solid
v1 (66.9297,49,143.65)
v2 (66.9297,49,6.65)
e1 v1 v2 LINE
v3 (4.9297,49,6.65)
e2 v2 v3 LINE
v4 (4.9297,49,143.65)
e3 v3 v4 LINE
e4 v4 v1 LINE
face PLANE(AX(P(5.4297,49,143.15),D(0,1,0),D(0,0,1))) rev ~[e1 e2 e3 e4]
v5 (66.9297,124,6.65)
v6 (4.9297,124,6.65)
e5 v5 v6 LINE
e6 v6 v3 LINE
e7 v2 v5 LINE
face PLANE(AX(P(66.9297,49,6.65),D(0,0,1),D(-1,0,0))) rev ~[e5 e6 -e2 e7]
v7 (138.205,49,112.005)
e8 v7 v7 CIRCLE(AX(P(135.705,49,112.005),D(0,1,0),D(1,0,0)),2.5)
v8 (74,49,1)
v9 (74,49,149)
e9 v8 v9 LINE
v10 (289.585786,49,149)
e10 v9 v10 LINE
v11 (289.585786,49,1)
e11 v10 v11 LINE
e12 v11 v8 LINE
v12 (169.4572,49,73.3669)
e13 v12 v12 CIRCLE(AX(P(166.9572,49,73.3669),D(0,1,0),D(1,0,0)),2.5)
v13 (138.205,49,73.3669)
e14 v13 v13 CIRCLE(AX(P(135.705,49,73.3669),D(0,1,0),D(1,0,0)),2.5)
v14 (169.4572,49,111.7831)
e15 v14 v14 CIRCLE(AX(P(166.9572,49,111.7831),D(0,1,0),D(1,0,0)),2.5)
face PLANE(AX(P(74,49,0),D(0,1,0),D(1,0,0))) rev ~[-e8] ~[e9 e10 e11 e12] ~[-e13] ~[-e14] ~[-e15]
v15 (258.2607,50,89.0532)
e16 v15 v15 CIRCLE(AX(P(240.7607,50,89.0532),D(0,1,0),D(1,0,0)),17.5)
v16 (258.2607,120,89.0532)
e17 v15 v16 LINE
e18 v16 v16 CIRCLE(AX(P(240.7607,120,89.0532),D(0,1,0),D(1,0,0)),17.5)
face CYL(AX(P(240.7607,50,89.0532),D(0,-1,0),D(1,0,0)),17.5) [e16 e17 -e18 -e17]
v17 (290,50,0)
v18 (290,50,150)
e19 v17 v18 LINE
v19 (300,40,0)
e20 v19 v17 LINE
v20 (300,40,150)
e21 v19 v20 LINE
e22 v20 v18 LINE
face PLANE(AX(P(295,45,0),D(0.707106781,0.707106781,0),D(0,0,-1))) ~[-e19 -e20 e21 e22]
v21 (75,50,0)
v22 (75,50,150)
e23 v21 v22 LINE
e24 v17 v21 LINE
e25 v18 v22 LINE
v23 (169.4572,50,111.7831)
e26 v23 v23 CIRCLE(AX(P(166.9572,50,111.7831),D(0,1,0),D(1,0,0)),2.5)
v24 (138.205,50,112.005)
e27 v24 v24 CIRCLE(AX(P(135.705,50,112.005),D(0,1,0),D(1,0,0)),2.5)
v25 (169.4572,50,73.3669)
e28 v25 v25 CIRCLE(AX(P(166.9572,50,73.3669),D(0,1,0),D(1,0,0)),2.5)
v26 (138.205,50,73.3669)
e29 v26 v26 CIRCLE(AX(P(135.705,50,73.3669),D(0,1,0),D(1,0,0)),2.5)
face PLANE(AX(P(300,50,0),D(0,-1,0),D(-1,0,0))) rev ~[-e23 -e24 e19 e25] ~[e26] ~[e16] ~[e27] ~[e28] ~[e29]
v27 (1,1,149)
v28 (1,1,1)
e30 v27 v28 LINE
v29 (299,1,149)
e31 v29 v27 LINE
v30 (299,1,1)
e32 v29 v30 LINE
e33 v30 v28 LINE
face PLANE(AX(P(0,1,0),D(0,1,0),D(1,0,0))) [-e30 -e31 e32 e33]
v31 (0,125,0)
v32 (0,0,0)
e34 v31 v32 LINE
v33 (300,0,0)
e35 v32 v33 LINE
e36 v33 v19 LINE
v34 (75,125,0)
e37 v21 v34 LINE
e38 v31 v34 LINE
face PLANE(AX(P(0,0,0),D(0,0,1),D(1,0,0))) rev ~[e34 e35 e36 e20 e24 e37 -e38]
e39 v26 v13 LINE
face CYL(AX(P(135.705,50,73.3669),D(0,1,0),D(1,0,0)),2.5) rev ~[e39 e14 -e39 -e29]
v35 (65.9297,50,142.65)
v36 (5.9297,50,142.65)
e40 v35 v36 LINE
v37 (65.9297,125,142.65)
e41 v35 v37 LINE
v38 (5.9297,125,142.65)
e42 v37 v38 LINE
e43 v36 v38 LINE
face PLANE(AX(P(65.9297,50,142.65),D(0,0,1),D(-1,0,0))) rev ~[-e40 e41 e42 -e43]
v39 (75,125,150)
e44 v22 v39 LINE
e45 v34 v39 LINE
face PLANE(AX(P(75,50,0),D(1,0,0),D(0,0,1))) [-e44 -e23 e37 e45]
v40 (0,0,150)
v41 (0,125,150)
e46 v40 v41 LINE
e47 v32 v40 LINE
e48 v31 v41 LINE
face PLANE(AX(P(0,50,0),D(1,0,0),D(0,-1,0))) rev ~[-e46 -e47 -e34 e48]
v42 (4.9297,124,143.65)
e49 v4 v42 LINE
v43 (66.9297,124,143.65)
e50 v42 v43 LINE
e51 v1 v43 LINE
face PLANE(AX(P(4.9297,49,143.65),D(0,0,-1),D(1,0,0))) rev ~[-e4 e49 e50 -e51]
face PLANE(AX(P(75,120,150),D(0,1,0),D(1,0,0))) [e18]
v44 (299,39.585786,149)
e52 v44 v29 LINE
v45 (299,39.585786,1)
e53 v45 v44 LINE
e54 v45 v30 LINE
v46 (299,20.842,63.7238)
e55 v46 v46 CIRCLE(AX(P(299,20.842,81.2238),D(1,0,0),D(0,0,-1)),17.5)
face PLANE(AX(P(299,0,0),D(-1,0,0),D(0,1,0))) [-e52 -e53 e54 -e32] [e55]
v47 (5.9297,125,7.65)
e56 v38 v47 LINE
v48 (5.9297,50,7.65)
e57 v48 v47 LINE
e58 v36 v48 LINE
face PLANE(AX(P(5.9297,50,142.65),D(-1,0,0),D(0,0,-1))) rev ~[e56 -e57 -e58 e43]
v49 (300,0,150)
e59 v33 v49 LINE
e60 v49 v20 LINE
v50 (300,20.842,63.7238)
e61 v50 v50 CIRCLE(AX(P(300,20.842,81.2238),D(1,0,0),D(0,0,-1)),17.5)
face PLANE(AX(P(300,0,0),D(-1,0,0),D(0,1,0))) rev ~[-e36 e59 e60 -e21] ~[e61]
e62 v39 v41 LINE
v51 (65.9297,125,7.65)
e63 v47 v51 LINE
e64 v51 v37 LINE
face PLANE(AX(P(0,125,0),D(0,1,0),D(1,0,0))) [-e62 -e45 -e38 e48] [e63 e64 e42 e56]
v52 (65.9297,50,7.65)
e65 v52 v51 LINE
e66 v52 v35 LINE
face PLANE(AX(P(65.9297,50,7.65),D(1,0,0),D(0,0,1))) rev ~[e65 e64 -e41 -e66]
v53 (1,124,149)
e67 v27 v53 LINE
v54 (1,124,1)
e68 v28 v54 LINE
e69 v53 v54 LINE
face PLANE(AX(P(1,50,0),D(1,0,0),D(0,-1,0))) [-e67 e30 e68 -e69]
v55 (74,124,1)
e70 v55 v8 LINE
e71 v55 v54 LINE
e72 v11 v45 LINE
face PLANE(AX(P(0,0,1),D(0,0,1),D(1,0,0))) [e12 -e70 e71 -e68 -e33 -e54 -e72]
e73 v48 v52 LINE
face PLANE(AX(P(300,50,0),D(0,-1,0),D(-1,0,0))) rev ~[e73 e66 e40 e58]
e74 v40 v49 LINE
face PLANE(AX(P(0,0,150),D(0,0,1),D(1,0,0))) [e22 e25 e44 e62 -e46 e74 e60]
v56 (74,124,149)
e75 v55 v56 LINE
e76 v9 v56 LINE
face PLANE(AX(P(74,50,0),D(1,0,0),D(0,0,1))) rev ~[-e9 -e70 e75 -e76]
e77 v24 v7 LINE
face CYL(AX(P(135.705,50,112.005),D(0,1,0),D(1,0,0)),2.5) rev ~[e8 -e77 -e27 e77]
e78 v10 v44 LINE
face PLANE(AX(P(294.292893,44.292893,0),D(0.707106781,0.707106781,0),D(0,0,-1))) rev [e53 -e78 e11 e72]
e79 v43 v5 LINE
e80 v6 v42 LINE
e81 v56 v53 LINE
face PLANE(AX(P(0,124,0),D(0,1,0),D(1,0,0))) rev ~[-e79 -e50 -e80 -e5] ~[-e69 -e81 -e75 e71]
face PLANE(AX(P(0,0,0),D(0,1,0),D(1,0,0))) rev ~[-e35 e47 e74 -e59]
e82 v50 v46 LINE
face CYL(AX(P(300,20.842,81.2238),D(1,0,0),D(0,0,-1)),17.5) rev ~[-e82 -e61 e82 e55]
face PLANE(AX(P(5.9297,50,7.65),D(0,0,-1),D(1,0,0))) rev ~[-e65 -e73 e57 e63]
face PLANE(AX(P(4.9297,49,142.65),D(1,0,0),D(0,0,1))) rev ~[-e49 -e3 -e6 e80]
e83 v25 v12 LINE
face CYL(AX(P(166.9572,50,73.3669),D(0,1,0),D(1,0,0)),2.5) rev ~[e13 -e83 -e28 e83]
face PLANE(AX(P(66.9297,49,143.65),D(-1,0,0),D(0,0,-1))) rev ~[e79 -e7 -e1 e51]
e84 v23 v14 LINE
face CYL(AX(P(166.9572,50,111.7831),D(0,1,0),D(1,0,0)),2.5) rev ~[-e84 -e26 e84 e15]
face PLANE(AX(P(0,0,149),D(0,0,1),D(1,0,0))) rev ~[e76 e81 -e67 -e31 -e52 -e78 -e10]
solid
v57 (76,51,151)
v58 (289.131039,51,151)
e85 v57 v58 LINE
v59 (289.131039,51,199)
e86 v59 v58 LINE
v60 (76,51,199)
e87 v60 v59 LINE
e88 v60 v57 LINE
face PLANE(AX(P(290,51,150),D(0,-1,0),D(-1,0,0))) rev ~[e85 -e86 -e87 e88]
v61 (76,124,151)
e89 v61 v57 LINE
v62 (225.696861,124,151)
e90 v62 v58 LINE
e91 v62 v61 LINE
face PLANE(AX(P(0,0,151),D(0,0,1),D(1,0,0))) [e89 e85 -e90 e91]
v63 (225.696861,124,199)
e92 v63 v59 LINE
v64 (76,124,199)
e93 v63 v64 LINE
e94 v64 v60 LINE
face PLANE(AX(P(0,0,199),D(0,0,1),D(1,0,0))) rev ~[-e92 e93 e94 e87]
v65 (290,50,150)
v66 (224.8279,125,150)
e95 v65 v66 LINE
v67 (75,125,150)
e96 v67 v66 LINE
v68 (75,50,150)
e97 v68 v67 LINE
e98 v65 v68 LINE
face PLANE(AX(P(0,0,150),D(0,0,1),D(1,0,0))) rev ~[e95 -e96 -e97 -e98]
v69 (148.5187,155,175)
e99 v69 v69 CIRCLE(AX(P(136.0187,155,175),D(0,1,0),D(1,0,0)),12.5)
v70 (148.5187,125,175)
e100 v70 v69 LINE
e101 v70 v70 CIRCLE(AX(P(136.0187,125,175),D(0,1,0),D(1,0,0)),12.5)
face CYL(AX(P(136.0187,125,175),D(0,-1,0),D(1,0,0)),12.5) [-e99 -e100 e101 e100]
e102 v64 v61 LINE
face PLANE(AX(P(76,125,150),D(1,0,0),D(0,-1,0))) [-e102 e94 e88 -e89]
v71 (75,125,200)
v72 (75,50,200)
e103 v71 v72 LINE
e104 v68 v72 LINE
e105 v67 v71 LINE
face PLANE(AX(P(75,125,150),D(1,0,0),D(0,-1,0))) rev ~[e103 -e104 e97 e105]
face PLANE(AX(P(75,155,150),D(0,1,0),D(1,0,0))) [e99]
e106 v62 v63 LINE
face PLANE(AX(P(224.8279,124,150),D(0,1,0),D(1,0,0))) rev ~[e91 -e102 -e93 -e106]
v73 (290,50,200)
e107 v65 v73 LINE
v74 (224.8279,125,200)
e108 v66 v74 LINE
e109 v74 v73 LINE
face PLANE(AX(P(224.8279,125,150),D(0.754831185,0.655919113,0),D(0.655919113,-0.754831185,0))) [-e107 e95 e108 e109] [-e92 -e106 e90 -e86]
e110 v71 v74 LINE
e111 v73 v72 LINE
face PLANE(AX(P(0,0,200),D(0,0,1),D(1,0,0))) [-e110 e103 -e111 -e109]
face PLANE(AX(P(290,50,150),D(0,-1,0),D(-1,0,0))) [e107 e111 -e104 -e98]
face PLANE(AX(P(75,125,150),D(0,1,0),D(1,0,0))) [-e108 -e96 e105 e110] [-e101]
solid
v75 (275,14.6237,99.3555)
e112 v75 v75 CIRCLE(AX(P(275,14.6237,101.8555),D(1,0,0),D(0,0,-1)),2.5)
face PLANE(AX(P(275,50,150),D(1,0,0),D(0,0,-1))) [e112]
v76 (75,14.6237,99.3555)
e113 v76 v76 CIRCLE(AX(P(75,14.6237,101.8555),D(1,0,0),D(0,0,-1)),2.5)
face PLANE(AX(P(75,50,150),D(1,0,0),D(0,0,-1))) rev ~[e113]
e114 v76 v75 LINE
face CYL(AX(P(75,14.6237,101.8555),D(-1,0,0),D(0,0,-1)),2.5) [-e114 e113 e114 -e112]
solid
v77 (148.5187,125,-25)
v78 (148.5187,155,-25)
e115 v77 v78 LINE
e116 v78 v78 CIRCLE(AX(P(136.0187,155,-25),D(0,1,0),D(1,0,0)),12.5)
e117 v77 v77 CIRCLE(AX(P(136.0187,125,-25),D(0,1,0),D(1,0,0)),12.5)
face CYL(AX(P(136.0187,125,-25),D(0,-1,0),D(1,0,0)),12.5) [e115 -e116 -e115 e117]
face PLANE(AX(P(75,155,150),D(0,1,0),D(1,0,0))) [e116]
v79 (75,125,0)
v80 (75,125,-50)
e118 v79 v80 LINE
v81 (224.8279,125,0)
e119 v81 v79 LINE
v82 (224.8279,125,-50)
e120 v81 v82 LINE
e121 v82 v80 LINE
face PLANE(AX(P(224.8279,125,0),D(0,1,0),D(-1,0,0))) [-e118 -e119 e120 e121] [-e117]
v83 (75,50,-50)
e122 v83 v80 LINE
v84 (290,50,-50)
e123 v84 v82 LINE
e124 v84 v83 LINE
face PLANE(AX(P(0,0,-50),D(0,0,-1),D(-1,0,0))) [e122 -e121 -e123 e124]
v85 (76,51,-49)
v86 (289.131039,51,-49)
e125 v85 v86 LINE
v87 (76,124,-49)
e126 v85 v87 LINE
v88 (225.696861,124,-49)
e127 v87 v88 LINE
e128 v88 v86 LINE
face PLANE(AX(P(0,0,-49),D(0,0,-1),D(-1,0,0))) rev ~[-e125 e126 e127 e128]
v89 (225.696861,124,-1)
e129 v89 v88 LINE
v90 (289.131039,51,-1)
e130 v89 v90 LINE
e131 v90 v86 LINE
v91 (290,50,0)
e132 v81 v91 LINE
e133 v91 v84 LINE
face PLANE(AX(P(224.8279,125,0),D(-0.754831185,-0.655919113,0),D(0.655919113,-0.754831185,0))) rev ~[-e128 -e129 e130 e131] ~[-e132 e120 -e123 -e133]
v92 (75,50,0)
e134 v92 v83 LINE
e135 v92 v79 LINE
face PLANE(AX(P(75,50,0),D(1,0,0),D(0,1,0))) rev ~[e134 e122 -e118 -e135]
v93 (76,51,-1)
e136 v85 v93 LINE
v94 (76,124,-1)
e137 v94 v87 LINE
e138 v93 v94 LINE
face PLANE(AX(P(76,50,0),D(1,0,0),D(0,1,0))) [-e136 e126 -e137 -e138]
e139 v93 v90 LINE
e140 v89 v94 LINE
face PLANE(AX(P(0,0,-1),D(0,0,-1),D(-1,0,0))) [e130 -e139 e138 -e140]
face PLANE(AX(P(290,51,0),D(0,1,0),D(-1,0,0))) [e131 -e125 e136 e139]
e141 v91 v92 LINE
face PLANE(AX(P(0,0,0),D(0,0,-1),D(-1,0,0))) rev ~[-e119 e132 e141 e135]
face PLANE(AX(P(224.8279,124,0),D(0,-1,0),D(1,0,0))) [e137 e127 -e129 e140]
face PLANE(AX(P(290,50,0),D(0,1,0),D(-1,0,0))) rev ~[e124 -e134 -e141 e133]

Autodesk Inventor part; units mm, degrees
ref_plane "YZ Plane" through (0, 0, 0) normal (1, 0, 0) x (0, 1, 0)
ref_plane "XZ Plane" through (0, 0, 0) normal (0, 1, 0) x (-1, 0, 0)
sketch "Sketch1" plane through (0, 0, 0) normal (0, 0, 1) x (1, 0, 0)
  line L0 (0, 0) -> (300, 0)
  line L1 (300, 0) -> (300, 50)
  line L2 (300, 50) -> (0, 50)
  line L3 (0, 50) -> (0, 0)
  dimension "d0" = 300
  dimension "d1" = 50
extrude "Extrusion1" add sketch "Sketch1" along normal blind 150
sketch "Sketch2" plane through (0, 50, 0) normal (0, 1, 0) x (1, 0, 0)
  line L0 (0, 0) -> (0, -150) projected
  line L1 (300, -150) -> (0, -150) projected
  line L2 (0, 0) -> (75, 0)
  line L3 (75, 0) -> (75, -150)
  line L4 (75, -150) -> (0, -150)
  line L5 (0, -150) -> (0, 0)
  line L6 (5.9297, -7.65) -> (65.9297, -7.65)
  line L7 (65.9297, -7.65) -> (65.9297, -142.65)
  line L8 (65.9297, -142.65) -> (5.9297, -142.65)
  line L9 (5.9297, -142.65) -> (5.9297, -7.65)
  dimension "d4" = 75
  dimension "d5" = 60
  dimension "d6" = 135
  dimension "d7" = 7.35
extrude "Extrusion2" add sketch "Sketch2" along normal blind 75
sketch "Sketch3" plane through (300, 50, 150) normal (0, 1, 0) x (1, 0, 0)
  point P0 (-300, 150)
chamfer "Chamfer1" distance 10 angle 45 1 edges at (300, 50, 75)
sketch "Sketch5" plane through (75, 50, 150) normal (1, 0, 0) x (0, 0, -1)
  point P0 (150, -50)
sketch "Sketch6" plane through (0, 0, 150) normal (0, 0, 1) x (1, 0, 0)
  line L0 (75, 125) -> (224.8279, 125)
  line L1 (290, 50) -> (75, 50) projected
  line L2 (224.8279, 125) -> (290, 50)
  line L3 (75, 125) -> (75, 50)
  line L4 (290, 50) -> (75, 50) projected
  line L5 (75, 50) -> (290, 50)
  point P0 (0, 0)
extrude "Extrusion4" add sketch "Sketch6" along normal blind 50
sketch "Sketch7" plane through (0, 0, 150) normal (0, 0, -1) x (-1, 0, 0)
  point P0 (0, 0)
sketch "Sketch8" plane through (0, 0, 0) normal (0, 0, -1) x (-1, 0, 0)
  line L0 (-224.8279, 125) -> (-75, 125) projected
  line L1 (-75, 125) -> (-224.8279, 125)
  line L2 (-290, 50) -> (-300, 40) projected
  line L3 (-224.8279, 125) -> (-290, 50)
  line L4 (-290, 50) -> (-75, 50)
  line L5 (0, 125) -> (-75, 125) projected
  line L6 (-75, 50) -> (-75, 125)
  point P0 (0, 0)
extrude "Extrusion5" add sketch "Sketch8" along normal blind 50
shell "Shell1" thickness 1 removed faces 2 at (268.276, 75, 183.3333) at (246.5519, 100, -33.3333)
sketch "Sketch9" plane through (75, 125, 150) normal (0, 1, 0) x (1, 0, 0)
  circle A0 centre (61.0187, -25) radius 12.5
  circle A1 centre (61.0187, 175) radius 12.5
  circle A2 centre (61.0187, -29.8112) radius 0.5
  circle A3 centre (61.0187, -24.9762) radius 0.5
  point P0 (-75, 150)
  dimension "d22" = 25
  dimension "d23" = 25
  dimension "d32" = 1
  dimension "d33" = 1
  dimension "d34" = 4.835
extrude "Extrusion6" add sketch "Sketch9" along normal blind 30 contours A0 | A1 | A2 | A3
sketch "Sketch10" plane through (75, 50, 150) normal (0, 1, 0) x (1, 0, 0)
  circle A0 centre (165.7607, 60.9468) radius 17.5
  point P0 (-75, 150)
  dimension "d26" = 35
extrude "Extrusion7" add sketch "Sketch10" along normal blind 70
sketch "Sketch11" plane through (300, 0, 150) normal (1, 0, 0) x (0, 0, -1)
  point P0 (150, 0)
sketch "Sketch12" plane through (300, 0, 150) normal (1, 0, 0) x (0, 0, -1)
  point P0 (150, 0)
sketch "Sketch13" plane through (300, 0, 150) normal (1, 0, 0) x (0, 0, -1)
  circle A0 centre (68.7762, 20.842) radius 17.5
  point P0 (150, 0)
  dimension "d29" = 35
extrude "Extrusion8" cut sketch "Sketch13" against normal blind 5
sketch "Sketch14" plane through (136.0187, 155, 175) normal (0, 1, 0) x (1, 0, 0)
  point P0 (-136.0187, 175)
sketch "Sketch15" plane through (300, 0, 150) normal (1, 0, 0) x (0, 0, -1)
  point P0 (150, 0)
sketch "Sketch16" plane through (75, 50, 150) normal (1, 0, 0) x (0, 0, -1)
  circle A0 centre (48.1445, -35.3763) radius 2.5
  point P0 (150, -50)
  dimension "d35" = 5
extrude "Extrusion9" add sketch "Sketch16" along normal blind 200
ref_plane "Work Plane1" through (171.5, 50, 150) normal (1, 0, 0) x (0, 0, -1)
sketch "Sketch18" plane through (75, 50, 150) normal (0, 1, 0) x (1, 0, 0)
  line L0 (0, 50.6445) -> (200, 50.6445) projected
  circle A0 centre (60.705, 37.995) radius 2.5
  circle A1 centre (60.705, 76.6331) radius 2.5
  circle A2 centre (91.9572, 38.2169) radius 2.5
  circle A3 centre (91.9572, 76.6331) radius 2.5
  point P0 (-75, 150)
  dimension "d44" = 5
  dimension "d45" = 5
extrude "Extrusion11" cut sketch "Sketch18" against normal blind 10
sketch "Sketch19" plane through (75, 50, 150) normal (0, 1, 0) x (1, 0, 0)
  point P0 (-75, 150)
sketch "Sketch20" plane through (75, 50, 150) normal (0, 1, 0) x (1, 0, 0)
  point P0 (-75, 150)
properties material "Acetal Resin, White"
